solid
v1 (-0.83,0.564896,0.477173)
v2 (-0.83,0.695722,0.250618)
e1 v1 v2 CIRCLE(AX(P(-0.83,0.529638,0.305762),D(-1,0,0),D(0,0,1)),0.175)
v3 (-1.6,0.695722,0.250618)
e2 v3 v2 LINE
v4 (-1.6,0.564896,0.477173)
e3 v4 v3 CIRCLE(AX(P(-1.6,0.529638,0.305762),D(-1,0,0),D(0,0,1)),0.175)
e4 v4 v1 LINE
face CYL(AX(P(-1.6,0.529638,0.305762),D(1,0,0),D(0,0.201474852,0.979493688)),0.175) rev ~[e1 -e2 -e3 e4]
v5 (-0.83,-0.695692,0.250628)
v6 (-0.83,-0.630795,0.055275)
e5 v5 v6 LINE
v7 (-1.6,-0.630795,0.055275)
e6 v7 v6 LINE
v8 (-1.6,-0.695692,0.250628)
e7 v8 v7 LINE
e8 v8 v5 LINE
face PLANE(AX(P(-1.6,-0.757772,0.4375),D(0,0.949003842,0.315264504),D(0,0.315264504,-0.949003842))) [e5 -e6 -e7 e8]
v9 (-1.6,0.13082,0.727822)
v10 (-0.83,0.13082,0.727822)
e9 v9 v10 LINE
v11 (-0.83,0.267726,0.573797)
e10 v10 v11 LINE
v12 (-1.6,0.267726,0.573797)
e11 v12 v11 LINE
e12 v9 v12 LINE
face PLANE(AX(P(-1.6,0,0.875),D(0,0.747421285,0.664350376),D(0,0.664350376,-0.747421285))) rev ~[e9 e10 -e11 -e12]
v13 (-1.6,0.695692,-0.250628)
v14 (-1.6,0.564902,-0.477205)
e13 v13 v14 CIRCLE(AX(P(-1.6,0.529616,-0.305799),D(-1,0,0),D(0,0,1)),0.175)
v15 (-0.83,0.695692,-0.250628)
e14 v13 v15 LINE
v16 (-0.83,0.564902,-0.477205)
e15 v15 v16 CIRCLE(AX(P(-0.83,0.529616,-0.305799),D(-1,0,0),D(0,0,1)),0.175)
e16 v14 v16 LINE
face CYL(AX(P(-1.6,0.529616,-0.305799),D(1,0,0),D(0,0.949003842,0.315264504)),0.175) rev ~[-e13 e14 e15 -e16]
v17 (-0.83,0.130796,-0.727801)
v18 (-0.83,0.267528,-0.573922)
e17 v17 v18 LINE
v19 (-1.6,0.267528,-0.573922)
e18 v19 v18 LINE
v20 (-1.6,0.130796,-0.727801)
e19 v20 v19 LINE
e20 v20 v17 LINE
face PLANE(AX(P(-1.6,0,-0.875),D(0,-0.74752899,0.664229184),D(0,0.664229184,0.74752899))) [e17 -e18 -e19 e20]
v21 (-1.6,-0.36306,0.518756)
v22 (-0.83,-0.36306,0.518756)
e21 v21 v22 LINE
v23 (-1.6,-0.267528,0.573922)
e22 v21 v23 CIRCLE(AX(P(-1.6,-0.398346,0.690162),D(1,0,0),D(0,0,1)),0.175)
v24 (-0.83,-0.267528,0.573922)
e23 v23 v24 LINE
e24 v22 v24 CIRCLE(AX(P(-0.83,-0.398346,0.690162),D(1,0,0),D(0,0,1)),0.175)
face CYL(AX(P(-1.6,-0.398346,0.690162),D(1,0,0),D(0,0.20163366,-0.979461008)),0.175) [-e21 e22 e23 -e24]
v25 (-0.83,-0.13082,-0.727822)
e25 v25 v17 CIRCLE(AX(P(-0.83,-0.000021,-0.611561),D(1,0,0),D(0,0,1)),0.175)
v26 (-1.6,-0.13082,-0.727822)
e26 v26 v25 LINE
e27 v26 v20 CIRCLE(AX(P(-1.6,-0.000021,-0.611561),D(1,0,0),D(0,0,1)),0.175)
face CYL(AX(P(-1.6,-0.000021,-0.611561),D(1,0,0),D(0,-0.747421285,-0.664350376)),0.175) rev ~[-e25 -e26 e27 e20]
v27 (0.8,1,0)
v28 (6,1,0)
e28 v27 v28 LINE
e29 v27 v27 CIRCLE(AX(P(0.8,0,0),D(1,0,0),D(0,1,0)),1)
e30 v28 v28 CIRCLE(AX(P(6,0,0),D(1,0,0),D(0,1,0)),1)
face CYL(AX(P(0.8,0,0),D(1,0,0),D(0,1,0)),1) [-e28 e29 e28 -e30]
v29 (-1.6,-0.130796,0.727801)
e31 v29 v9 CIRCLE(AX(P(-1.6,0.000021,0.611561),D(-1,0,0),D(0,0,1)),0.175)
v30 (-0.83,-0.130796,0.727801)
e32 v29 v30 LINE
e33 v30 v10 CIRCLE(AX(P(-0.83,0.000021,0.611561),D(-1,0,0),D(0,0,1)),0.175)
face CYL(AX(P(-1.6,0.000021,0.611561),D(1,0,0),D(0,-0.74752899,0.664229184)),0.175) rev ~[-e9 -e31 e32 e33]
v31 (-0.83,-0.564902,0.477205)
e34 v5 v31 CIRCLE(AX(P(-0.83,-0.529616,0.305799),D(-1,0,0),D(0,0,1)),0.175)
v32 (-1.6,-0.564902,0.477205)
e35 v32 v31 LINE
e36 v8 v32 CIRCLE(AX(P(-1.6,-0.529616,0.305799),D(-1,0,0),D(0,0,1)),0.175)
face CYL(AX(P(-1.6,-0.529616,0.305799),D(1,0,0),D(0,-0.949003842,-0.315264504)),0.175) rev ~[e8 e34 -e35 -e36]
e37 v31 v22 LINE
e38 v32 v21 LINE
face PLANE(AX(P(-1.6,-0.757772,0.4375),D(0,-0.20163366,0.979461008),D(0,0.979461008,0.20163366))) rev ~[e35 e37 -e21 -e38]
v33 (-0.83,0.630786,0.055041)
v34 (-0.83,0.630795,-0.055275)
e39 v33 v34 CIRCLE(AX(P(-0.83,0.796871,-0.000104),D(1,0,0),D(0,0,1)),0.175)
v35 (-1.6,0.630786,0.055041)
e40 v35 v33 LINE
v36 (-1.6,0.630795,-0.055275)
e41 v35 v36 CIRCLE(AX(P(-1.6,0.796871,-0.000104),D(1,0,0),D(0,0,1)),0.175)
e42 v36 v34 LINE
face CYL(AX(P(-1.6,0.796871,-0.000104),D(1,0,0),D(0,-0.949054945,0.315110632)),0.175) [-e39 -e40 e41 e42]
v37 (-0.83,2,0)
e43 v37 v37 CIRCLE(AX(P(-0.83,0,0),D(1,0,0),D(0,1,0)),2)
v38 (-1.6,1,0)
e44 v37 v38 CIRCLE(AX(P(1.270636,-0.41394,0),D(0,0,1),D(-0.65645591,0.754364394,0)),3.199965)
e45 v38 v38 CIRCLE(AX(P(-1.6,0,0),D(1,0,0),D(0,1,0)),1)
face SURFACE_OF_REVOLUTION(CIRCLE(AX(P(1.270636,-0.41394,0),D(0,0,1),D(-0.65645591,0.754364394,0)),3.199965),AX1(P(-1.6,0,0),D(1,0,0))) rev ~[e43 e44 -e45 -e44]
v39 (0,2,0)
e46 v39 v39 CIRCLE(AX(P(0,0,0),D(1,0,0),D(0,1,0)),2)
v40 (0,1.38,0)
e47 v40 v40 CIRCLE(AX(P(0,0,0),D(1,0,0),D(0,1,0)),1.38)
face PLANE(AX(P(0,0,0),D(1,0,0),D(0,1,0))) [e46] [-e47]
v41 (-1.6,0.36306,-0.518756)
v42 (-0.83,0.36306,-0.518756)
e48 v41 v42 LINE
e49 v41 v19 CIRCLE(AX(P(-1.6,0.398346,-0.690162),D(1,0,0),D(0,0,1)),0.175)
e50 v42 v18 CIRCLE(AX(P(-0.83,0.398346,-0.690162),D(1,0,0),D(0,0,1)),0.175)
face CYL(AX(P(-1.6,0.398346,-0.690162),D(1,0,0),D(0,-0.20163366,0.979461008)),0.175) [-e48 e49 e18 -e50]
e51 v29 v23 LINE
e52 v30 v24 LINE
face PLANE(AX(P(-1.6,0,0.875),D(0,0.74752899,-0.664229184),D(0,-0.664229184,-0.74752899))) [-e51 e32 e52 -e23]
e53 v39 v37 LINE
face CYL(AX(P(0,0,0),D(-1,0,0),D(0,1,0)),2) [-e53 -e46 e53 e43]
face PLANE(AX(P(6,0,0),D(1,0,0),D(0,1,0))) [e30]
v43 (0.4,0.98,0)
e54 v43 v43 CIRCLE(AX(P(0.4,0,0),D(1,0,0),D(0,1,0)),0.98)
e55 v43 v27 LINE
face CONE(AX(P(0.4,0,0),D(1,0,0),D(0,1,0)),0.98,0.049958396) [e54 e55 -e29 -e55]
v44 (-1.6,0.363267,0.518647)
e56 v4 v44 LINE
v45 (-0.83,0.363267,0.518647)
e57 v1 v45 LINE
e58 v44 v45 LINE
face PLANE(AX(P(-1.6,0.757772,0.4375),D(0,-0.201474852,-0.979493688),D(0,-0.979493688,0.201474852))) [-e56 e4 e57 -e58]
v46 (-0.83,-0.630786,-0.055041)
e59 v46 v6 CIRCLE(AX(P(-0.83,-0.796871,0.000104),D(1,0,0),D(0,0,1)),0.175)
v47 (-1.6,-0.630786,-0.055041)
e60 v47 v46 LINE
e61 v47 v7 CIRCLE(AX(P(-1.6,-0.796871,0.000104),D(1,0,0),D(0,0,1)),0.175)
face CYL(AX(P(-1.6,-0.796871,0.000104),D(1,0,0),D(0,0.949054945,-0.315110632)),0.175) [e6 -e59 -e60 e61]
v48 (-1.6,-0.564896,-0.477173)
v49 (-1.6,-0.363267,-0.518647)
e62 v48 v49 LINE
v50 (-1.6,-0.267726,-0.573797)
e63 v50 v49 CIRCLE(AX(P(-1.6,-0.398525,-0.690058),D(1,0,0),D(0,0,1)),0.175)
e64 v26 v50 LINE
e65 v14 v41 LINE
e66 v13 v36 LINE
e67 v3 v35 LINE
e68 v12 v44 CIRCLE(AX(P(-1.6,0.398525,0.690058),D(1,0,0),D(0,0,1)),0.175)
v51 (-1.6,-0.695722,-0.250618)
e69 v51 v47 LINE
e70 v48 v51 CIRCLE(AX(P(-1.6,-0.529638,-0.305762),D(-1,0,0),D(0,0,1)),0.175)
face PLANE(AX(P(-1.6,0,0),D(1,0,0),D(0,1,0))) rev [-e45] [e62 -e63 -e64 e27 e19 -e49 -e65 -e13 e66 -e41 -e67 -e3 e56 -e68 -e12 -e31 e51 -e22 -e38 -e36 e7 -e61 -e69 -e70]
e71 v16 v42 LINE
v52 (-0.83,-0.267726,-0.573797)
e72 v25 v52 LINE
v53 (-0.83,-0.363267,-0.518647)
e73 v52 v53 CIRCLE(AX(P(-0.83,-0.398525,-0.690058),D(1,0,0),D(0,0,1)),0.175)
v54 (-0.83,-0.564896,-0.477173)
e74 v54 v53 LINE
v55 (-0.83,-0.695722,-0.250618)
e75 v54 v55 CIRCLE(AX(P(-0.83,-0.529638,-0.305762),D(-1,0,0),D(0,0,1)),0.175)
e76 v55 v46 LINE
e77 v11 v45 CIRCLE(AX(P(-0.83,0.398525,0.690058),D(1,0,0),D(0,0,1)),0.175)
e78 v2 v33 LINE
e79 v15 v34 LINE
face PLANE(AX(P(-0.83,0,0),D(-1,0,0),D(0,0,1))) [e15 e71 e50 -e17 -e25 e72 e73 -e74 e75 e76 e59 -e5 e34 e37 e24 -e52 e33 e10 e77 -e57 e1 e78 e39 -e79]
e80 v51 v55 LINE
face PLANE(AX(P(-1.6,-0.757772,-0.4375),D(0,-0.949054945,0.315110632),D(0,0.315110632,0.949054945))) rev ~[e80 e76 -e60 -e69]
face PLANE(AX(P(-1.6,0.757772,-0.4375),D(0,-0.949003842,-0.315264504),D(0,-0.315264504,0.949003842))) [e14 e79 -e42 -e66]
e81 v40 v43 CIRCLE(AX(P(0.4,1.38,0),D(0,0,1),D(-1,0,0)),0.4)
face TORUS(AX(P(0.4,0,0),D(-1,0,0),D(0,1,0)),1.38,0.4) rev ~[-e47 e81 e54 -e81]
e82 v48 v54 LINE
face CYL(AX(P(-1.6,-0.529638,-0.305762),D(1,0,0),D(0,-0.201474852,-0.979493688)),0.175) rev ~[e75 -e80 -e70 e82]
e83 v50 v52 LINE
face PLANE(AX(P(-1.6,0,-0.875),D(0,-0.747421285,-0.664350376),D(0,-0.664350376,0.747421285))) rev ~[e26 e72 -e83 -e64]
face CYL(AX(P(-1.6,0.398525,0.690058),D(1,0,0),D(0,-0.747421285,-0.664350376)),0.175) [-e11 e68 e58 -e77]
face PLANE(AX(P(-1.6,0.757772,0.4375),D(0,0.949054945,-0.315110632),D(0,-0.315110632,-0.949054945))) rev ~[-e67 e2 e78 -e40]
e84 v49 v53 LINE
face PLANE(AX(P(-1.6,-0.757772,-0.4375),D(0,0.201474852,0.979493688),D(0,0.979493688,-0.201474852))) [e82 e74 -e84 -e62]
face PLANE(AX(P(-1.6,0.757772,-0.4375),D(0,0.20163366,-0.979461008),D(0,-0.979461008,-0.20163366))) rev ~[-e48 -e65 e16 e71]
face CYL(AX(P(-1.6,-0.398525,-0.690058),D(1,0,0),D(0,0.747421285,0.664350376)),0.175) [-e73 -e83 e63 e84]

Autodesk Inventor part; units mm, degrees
ref_plane "YZ Plane" through (0, 0, 0) normal (1, 0, 0) x (0, 1, 0)
ref_plane "XZ Plane" through (0, 0, 0) normal (0, 1, 0) x (-1, 0, 0)
ref_plane "XY Plane" through (0, 0, 0) normal (0, 0, 1) x (1, 0, 0)
sketch "Sketch4" plane through (0, 0, 0) normal (0, 0, 1) x (1, 0, 0)
  line L0 (-1.6, 0) -> (6, 0)
  line L1 (0, 0) -> (-1.6, 0)
  line L2 (0, 2) -> (0, 1.38)
  line L3 (0.4, 0.98) -> (0.4, 0.98)
  line L4 (0.4, 0.98) -> (0.8, 1)
  arc A0 (0, 1.38) -> (0.4, 0.98) centre (0.4, 1.38) ccw
  line L5 (-1.6, 0) -> (-1.6, 1)
  line L6 (0, 2) -> (-0.83, 2)
  arc A1 (-0.83, 2) -> (-1.6, 1) centre (1.2707, -0.414) ccw
  line L7 (0.8, 1) -> (6, 1)
  line L8 (6, 1) -> (6, 0)
  point P0 (0, 0.98)
  dimension "d71" = 0.4
  dimension "d72" = 6
  dimension "d74" = 0.4
  dimension "d75" = 1.96
  dimension "d78" = 2
  dimension "d82" = 3.2
  dimension "d83" = 1.6
  dimension "d84" = 4
  dimension "d104" = 5.2
  dimension "d105" = 2
revolve "Revolution7" add sketch "Sketch4" angle 360 about axis through (-1.6, 0, 0) along (1, 0, 0)
sketch "Sketch5" plane through (-1.6, 0, 0) normal (-1, 0, 0) x (0, 0, 1)
  circle A0 centre (0, 0) radius 0.875 construction
  circle A1 centre (0, 0) radius 0.6125 construction
  line L0 (0, 0) -> (-0.5304, 0.3062)
  line L1 (0, 0) -> (-0.5304, -0.3063)
  line L2 (-1.8008, 0) -> (1.7887, 0)
  line L3 (-0.875, 0) -> (-0.5304, -0.3063)
  line L4 (-0.875, 0) -> (-0.5304, 0.3062)
  point P0 (0, 0)
  dimension "d88" = 1.75
  dimension "d89" = 1.225
  dimension "d90" = 30
  dimension "d91" = 30
extrude "Extrusion1" cut sketch "Sketch5" against normal blind 0.77
pattern_circular "Circular Pattern1" count 6 over 360 about axis through (-10, 0, 0) along (1, 0, 0) of "Extrusion1"
fillet "Fillet1" radius 0.175 12 edges at (-1.215, -0.7578, -0.4375) (-1.215, -0.3063, -0.5304) (-1.215, -0.6125, 0) (-1.215, -0.7578, 0.4375) (-1.215, -0.3062, 0.5304) (-1.215, 0, 0.875) (-1.215, 0.6125, 0) (-1.215, 0.7578, 0.4375) (-1.215, 0.3063, 0.5304) (-1.215, 0.3062, -0.5304) (-1.215, 0, -0.875) (-1.215, 0.7578, -0.4375)
thread "Thread7" size "M2x0.4" class "6g" standard "ISO Metric profile" length 5.2
properties part number "Šroub s válcovou hlavou a šestiramennou drážkou ISO 14583 - M2 x 6 - 4.8" material "Steel"
